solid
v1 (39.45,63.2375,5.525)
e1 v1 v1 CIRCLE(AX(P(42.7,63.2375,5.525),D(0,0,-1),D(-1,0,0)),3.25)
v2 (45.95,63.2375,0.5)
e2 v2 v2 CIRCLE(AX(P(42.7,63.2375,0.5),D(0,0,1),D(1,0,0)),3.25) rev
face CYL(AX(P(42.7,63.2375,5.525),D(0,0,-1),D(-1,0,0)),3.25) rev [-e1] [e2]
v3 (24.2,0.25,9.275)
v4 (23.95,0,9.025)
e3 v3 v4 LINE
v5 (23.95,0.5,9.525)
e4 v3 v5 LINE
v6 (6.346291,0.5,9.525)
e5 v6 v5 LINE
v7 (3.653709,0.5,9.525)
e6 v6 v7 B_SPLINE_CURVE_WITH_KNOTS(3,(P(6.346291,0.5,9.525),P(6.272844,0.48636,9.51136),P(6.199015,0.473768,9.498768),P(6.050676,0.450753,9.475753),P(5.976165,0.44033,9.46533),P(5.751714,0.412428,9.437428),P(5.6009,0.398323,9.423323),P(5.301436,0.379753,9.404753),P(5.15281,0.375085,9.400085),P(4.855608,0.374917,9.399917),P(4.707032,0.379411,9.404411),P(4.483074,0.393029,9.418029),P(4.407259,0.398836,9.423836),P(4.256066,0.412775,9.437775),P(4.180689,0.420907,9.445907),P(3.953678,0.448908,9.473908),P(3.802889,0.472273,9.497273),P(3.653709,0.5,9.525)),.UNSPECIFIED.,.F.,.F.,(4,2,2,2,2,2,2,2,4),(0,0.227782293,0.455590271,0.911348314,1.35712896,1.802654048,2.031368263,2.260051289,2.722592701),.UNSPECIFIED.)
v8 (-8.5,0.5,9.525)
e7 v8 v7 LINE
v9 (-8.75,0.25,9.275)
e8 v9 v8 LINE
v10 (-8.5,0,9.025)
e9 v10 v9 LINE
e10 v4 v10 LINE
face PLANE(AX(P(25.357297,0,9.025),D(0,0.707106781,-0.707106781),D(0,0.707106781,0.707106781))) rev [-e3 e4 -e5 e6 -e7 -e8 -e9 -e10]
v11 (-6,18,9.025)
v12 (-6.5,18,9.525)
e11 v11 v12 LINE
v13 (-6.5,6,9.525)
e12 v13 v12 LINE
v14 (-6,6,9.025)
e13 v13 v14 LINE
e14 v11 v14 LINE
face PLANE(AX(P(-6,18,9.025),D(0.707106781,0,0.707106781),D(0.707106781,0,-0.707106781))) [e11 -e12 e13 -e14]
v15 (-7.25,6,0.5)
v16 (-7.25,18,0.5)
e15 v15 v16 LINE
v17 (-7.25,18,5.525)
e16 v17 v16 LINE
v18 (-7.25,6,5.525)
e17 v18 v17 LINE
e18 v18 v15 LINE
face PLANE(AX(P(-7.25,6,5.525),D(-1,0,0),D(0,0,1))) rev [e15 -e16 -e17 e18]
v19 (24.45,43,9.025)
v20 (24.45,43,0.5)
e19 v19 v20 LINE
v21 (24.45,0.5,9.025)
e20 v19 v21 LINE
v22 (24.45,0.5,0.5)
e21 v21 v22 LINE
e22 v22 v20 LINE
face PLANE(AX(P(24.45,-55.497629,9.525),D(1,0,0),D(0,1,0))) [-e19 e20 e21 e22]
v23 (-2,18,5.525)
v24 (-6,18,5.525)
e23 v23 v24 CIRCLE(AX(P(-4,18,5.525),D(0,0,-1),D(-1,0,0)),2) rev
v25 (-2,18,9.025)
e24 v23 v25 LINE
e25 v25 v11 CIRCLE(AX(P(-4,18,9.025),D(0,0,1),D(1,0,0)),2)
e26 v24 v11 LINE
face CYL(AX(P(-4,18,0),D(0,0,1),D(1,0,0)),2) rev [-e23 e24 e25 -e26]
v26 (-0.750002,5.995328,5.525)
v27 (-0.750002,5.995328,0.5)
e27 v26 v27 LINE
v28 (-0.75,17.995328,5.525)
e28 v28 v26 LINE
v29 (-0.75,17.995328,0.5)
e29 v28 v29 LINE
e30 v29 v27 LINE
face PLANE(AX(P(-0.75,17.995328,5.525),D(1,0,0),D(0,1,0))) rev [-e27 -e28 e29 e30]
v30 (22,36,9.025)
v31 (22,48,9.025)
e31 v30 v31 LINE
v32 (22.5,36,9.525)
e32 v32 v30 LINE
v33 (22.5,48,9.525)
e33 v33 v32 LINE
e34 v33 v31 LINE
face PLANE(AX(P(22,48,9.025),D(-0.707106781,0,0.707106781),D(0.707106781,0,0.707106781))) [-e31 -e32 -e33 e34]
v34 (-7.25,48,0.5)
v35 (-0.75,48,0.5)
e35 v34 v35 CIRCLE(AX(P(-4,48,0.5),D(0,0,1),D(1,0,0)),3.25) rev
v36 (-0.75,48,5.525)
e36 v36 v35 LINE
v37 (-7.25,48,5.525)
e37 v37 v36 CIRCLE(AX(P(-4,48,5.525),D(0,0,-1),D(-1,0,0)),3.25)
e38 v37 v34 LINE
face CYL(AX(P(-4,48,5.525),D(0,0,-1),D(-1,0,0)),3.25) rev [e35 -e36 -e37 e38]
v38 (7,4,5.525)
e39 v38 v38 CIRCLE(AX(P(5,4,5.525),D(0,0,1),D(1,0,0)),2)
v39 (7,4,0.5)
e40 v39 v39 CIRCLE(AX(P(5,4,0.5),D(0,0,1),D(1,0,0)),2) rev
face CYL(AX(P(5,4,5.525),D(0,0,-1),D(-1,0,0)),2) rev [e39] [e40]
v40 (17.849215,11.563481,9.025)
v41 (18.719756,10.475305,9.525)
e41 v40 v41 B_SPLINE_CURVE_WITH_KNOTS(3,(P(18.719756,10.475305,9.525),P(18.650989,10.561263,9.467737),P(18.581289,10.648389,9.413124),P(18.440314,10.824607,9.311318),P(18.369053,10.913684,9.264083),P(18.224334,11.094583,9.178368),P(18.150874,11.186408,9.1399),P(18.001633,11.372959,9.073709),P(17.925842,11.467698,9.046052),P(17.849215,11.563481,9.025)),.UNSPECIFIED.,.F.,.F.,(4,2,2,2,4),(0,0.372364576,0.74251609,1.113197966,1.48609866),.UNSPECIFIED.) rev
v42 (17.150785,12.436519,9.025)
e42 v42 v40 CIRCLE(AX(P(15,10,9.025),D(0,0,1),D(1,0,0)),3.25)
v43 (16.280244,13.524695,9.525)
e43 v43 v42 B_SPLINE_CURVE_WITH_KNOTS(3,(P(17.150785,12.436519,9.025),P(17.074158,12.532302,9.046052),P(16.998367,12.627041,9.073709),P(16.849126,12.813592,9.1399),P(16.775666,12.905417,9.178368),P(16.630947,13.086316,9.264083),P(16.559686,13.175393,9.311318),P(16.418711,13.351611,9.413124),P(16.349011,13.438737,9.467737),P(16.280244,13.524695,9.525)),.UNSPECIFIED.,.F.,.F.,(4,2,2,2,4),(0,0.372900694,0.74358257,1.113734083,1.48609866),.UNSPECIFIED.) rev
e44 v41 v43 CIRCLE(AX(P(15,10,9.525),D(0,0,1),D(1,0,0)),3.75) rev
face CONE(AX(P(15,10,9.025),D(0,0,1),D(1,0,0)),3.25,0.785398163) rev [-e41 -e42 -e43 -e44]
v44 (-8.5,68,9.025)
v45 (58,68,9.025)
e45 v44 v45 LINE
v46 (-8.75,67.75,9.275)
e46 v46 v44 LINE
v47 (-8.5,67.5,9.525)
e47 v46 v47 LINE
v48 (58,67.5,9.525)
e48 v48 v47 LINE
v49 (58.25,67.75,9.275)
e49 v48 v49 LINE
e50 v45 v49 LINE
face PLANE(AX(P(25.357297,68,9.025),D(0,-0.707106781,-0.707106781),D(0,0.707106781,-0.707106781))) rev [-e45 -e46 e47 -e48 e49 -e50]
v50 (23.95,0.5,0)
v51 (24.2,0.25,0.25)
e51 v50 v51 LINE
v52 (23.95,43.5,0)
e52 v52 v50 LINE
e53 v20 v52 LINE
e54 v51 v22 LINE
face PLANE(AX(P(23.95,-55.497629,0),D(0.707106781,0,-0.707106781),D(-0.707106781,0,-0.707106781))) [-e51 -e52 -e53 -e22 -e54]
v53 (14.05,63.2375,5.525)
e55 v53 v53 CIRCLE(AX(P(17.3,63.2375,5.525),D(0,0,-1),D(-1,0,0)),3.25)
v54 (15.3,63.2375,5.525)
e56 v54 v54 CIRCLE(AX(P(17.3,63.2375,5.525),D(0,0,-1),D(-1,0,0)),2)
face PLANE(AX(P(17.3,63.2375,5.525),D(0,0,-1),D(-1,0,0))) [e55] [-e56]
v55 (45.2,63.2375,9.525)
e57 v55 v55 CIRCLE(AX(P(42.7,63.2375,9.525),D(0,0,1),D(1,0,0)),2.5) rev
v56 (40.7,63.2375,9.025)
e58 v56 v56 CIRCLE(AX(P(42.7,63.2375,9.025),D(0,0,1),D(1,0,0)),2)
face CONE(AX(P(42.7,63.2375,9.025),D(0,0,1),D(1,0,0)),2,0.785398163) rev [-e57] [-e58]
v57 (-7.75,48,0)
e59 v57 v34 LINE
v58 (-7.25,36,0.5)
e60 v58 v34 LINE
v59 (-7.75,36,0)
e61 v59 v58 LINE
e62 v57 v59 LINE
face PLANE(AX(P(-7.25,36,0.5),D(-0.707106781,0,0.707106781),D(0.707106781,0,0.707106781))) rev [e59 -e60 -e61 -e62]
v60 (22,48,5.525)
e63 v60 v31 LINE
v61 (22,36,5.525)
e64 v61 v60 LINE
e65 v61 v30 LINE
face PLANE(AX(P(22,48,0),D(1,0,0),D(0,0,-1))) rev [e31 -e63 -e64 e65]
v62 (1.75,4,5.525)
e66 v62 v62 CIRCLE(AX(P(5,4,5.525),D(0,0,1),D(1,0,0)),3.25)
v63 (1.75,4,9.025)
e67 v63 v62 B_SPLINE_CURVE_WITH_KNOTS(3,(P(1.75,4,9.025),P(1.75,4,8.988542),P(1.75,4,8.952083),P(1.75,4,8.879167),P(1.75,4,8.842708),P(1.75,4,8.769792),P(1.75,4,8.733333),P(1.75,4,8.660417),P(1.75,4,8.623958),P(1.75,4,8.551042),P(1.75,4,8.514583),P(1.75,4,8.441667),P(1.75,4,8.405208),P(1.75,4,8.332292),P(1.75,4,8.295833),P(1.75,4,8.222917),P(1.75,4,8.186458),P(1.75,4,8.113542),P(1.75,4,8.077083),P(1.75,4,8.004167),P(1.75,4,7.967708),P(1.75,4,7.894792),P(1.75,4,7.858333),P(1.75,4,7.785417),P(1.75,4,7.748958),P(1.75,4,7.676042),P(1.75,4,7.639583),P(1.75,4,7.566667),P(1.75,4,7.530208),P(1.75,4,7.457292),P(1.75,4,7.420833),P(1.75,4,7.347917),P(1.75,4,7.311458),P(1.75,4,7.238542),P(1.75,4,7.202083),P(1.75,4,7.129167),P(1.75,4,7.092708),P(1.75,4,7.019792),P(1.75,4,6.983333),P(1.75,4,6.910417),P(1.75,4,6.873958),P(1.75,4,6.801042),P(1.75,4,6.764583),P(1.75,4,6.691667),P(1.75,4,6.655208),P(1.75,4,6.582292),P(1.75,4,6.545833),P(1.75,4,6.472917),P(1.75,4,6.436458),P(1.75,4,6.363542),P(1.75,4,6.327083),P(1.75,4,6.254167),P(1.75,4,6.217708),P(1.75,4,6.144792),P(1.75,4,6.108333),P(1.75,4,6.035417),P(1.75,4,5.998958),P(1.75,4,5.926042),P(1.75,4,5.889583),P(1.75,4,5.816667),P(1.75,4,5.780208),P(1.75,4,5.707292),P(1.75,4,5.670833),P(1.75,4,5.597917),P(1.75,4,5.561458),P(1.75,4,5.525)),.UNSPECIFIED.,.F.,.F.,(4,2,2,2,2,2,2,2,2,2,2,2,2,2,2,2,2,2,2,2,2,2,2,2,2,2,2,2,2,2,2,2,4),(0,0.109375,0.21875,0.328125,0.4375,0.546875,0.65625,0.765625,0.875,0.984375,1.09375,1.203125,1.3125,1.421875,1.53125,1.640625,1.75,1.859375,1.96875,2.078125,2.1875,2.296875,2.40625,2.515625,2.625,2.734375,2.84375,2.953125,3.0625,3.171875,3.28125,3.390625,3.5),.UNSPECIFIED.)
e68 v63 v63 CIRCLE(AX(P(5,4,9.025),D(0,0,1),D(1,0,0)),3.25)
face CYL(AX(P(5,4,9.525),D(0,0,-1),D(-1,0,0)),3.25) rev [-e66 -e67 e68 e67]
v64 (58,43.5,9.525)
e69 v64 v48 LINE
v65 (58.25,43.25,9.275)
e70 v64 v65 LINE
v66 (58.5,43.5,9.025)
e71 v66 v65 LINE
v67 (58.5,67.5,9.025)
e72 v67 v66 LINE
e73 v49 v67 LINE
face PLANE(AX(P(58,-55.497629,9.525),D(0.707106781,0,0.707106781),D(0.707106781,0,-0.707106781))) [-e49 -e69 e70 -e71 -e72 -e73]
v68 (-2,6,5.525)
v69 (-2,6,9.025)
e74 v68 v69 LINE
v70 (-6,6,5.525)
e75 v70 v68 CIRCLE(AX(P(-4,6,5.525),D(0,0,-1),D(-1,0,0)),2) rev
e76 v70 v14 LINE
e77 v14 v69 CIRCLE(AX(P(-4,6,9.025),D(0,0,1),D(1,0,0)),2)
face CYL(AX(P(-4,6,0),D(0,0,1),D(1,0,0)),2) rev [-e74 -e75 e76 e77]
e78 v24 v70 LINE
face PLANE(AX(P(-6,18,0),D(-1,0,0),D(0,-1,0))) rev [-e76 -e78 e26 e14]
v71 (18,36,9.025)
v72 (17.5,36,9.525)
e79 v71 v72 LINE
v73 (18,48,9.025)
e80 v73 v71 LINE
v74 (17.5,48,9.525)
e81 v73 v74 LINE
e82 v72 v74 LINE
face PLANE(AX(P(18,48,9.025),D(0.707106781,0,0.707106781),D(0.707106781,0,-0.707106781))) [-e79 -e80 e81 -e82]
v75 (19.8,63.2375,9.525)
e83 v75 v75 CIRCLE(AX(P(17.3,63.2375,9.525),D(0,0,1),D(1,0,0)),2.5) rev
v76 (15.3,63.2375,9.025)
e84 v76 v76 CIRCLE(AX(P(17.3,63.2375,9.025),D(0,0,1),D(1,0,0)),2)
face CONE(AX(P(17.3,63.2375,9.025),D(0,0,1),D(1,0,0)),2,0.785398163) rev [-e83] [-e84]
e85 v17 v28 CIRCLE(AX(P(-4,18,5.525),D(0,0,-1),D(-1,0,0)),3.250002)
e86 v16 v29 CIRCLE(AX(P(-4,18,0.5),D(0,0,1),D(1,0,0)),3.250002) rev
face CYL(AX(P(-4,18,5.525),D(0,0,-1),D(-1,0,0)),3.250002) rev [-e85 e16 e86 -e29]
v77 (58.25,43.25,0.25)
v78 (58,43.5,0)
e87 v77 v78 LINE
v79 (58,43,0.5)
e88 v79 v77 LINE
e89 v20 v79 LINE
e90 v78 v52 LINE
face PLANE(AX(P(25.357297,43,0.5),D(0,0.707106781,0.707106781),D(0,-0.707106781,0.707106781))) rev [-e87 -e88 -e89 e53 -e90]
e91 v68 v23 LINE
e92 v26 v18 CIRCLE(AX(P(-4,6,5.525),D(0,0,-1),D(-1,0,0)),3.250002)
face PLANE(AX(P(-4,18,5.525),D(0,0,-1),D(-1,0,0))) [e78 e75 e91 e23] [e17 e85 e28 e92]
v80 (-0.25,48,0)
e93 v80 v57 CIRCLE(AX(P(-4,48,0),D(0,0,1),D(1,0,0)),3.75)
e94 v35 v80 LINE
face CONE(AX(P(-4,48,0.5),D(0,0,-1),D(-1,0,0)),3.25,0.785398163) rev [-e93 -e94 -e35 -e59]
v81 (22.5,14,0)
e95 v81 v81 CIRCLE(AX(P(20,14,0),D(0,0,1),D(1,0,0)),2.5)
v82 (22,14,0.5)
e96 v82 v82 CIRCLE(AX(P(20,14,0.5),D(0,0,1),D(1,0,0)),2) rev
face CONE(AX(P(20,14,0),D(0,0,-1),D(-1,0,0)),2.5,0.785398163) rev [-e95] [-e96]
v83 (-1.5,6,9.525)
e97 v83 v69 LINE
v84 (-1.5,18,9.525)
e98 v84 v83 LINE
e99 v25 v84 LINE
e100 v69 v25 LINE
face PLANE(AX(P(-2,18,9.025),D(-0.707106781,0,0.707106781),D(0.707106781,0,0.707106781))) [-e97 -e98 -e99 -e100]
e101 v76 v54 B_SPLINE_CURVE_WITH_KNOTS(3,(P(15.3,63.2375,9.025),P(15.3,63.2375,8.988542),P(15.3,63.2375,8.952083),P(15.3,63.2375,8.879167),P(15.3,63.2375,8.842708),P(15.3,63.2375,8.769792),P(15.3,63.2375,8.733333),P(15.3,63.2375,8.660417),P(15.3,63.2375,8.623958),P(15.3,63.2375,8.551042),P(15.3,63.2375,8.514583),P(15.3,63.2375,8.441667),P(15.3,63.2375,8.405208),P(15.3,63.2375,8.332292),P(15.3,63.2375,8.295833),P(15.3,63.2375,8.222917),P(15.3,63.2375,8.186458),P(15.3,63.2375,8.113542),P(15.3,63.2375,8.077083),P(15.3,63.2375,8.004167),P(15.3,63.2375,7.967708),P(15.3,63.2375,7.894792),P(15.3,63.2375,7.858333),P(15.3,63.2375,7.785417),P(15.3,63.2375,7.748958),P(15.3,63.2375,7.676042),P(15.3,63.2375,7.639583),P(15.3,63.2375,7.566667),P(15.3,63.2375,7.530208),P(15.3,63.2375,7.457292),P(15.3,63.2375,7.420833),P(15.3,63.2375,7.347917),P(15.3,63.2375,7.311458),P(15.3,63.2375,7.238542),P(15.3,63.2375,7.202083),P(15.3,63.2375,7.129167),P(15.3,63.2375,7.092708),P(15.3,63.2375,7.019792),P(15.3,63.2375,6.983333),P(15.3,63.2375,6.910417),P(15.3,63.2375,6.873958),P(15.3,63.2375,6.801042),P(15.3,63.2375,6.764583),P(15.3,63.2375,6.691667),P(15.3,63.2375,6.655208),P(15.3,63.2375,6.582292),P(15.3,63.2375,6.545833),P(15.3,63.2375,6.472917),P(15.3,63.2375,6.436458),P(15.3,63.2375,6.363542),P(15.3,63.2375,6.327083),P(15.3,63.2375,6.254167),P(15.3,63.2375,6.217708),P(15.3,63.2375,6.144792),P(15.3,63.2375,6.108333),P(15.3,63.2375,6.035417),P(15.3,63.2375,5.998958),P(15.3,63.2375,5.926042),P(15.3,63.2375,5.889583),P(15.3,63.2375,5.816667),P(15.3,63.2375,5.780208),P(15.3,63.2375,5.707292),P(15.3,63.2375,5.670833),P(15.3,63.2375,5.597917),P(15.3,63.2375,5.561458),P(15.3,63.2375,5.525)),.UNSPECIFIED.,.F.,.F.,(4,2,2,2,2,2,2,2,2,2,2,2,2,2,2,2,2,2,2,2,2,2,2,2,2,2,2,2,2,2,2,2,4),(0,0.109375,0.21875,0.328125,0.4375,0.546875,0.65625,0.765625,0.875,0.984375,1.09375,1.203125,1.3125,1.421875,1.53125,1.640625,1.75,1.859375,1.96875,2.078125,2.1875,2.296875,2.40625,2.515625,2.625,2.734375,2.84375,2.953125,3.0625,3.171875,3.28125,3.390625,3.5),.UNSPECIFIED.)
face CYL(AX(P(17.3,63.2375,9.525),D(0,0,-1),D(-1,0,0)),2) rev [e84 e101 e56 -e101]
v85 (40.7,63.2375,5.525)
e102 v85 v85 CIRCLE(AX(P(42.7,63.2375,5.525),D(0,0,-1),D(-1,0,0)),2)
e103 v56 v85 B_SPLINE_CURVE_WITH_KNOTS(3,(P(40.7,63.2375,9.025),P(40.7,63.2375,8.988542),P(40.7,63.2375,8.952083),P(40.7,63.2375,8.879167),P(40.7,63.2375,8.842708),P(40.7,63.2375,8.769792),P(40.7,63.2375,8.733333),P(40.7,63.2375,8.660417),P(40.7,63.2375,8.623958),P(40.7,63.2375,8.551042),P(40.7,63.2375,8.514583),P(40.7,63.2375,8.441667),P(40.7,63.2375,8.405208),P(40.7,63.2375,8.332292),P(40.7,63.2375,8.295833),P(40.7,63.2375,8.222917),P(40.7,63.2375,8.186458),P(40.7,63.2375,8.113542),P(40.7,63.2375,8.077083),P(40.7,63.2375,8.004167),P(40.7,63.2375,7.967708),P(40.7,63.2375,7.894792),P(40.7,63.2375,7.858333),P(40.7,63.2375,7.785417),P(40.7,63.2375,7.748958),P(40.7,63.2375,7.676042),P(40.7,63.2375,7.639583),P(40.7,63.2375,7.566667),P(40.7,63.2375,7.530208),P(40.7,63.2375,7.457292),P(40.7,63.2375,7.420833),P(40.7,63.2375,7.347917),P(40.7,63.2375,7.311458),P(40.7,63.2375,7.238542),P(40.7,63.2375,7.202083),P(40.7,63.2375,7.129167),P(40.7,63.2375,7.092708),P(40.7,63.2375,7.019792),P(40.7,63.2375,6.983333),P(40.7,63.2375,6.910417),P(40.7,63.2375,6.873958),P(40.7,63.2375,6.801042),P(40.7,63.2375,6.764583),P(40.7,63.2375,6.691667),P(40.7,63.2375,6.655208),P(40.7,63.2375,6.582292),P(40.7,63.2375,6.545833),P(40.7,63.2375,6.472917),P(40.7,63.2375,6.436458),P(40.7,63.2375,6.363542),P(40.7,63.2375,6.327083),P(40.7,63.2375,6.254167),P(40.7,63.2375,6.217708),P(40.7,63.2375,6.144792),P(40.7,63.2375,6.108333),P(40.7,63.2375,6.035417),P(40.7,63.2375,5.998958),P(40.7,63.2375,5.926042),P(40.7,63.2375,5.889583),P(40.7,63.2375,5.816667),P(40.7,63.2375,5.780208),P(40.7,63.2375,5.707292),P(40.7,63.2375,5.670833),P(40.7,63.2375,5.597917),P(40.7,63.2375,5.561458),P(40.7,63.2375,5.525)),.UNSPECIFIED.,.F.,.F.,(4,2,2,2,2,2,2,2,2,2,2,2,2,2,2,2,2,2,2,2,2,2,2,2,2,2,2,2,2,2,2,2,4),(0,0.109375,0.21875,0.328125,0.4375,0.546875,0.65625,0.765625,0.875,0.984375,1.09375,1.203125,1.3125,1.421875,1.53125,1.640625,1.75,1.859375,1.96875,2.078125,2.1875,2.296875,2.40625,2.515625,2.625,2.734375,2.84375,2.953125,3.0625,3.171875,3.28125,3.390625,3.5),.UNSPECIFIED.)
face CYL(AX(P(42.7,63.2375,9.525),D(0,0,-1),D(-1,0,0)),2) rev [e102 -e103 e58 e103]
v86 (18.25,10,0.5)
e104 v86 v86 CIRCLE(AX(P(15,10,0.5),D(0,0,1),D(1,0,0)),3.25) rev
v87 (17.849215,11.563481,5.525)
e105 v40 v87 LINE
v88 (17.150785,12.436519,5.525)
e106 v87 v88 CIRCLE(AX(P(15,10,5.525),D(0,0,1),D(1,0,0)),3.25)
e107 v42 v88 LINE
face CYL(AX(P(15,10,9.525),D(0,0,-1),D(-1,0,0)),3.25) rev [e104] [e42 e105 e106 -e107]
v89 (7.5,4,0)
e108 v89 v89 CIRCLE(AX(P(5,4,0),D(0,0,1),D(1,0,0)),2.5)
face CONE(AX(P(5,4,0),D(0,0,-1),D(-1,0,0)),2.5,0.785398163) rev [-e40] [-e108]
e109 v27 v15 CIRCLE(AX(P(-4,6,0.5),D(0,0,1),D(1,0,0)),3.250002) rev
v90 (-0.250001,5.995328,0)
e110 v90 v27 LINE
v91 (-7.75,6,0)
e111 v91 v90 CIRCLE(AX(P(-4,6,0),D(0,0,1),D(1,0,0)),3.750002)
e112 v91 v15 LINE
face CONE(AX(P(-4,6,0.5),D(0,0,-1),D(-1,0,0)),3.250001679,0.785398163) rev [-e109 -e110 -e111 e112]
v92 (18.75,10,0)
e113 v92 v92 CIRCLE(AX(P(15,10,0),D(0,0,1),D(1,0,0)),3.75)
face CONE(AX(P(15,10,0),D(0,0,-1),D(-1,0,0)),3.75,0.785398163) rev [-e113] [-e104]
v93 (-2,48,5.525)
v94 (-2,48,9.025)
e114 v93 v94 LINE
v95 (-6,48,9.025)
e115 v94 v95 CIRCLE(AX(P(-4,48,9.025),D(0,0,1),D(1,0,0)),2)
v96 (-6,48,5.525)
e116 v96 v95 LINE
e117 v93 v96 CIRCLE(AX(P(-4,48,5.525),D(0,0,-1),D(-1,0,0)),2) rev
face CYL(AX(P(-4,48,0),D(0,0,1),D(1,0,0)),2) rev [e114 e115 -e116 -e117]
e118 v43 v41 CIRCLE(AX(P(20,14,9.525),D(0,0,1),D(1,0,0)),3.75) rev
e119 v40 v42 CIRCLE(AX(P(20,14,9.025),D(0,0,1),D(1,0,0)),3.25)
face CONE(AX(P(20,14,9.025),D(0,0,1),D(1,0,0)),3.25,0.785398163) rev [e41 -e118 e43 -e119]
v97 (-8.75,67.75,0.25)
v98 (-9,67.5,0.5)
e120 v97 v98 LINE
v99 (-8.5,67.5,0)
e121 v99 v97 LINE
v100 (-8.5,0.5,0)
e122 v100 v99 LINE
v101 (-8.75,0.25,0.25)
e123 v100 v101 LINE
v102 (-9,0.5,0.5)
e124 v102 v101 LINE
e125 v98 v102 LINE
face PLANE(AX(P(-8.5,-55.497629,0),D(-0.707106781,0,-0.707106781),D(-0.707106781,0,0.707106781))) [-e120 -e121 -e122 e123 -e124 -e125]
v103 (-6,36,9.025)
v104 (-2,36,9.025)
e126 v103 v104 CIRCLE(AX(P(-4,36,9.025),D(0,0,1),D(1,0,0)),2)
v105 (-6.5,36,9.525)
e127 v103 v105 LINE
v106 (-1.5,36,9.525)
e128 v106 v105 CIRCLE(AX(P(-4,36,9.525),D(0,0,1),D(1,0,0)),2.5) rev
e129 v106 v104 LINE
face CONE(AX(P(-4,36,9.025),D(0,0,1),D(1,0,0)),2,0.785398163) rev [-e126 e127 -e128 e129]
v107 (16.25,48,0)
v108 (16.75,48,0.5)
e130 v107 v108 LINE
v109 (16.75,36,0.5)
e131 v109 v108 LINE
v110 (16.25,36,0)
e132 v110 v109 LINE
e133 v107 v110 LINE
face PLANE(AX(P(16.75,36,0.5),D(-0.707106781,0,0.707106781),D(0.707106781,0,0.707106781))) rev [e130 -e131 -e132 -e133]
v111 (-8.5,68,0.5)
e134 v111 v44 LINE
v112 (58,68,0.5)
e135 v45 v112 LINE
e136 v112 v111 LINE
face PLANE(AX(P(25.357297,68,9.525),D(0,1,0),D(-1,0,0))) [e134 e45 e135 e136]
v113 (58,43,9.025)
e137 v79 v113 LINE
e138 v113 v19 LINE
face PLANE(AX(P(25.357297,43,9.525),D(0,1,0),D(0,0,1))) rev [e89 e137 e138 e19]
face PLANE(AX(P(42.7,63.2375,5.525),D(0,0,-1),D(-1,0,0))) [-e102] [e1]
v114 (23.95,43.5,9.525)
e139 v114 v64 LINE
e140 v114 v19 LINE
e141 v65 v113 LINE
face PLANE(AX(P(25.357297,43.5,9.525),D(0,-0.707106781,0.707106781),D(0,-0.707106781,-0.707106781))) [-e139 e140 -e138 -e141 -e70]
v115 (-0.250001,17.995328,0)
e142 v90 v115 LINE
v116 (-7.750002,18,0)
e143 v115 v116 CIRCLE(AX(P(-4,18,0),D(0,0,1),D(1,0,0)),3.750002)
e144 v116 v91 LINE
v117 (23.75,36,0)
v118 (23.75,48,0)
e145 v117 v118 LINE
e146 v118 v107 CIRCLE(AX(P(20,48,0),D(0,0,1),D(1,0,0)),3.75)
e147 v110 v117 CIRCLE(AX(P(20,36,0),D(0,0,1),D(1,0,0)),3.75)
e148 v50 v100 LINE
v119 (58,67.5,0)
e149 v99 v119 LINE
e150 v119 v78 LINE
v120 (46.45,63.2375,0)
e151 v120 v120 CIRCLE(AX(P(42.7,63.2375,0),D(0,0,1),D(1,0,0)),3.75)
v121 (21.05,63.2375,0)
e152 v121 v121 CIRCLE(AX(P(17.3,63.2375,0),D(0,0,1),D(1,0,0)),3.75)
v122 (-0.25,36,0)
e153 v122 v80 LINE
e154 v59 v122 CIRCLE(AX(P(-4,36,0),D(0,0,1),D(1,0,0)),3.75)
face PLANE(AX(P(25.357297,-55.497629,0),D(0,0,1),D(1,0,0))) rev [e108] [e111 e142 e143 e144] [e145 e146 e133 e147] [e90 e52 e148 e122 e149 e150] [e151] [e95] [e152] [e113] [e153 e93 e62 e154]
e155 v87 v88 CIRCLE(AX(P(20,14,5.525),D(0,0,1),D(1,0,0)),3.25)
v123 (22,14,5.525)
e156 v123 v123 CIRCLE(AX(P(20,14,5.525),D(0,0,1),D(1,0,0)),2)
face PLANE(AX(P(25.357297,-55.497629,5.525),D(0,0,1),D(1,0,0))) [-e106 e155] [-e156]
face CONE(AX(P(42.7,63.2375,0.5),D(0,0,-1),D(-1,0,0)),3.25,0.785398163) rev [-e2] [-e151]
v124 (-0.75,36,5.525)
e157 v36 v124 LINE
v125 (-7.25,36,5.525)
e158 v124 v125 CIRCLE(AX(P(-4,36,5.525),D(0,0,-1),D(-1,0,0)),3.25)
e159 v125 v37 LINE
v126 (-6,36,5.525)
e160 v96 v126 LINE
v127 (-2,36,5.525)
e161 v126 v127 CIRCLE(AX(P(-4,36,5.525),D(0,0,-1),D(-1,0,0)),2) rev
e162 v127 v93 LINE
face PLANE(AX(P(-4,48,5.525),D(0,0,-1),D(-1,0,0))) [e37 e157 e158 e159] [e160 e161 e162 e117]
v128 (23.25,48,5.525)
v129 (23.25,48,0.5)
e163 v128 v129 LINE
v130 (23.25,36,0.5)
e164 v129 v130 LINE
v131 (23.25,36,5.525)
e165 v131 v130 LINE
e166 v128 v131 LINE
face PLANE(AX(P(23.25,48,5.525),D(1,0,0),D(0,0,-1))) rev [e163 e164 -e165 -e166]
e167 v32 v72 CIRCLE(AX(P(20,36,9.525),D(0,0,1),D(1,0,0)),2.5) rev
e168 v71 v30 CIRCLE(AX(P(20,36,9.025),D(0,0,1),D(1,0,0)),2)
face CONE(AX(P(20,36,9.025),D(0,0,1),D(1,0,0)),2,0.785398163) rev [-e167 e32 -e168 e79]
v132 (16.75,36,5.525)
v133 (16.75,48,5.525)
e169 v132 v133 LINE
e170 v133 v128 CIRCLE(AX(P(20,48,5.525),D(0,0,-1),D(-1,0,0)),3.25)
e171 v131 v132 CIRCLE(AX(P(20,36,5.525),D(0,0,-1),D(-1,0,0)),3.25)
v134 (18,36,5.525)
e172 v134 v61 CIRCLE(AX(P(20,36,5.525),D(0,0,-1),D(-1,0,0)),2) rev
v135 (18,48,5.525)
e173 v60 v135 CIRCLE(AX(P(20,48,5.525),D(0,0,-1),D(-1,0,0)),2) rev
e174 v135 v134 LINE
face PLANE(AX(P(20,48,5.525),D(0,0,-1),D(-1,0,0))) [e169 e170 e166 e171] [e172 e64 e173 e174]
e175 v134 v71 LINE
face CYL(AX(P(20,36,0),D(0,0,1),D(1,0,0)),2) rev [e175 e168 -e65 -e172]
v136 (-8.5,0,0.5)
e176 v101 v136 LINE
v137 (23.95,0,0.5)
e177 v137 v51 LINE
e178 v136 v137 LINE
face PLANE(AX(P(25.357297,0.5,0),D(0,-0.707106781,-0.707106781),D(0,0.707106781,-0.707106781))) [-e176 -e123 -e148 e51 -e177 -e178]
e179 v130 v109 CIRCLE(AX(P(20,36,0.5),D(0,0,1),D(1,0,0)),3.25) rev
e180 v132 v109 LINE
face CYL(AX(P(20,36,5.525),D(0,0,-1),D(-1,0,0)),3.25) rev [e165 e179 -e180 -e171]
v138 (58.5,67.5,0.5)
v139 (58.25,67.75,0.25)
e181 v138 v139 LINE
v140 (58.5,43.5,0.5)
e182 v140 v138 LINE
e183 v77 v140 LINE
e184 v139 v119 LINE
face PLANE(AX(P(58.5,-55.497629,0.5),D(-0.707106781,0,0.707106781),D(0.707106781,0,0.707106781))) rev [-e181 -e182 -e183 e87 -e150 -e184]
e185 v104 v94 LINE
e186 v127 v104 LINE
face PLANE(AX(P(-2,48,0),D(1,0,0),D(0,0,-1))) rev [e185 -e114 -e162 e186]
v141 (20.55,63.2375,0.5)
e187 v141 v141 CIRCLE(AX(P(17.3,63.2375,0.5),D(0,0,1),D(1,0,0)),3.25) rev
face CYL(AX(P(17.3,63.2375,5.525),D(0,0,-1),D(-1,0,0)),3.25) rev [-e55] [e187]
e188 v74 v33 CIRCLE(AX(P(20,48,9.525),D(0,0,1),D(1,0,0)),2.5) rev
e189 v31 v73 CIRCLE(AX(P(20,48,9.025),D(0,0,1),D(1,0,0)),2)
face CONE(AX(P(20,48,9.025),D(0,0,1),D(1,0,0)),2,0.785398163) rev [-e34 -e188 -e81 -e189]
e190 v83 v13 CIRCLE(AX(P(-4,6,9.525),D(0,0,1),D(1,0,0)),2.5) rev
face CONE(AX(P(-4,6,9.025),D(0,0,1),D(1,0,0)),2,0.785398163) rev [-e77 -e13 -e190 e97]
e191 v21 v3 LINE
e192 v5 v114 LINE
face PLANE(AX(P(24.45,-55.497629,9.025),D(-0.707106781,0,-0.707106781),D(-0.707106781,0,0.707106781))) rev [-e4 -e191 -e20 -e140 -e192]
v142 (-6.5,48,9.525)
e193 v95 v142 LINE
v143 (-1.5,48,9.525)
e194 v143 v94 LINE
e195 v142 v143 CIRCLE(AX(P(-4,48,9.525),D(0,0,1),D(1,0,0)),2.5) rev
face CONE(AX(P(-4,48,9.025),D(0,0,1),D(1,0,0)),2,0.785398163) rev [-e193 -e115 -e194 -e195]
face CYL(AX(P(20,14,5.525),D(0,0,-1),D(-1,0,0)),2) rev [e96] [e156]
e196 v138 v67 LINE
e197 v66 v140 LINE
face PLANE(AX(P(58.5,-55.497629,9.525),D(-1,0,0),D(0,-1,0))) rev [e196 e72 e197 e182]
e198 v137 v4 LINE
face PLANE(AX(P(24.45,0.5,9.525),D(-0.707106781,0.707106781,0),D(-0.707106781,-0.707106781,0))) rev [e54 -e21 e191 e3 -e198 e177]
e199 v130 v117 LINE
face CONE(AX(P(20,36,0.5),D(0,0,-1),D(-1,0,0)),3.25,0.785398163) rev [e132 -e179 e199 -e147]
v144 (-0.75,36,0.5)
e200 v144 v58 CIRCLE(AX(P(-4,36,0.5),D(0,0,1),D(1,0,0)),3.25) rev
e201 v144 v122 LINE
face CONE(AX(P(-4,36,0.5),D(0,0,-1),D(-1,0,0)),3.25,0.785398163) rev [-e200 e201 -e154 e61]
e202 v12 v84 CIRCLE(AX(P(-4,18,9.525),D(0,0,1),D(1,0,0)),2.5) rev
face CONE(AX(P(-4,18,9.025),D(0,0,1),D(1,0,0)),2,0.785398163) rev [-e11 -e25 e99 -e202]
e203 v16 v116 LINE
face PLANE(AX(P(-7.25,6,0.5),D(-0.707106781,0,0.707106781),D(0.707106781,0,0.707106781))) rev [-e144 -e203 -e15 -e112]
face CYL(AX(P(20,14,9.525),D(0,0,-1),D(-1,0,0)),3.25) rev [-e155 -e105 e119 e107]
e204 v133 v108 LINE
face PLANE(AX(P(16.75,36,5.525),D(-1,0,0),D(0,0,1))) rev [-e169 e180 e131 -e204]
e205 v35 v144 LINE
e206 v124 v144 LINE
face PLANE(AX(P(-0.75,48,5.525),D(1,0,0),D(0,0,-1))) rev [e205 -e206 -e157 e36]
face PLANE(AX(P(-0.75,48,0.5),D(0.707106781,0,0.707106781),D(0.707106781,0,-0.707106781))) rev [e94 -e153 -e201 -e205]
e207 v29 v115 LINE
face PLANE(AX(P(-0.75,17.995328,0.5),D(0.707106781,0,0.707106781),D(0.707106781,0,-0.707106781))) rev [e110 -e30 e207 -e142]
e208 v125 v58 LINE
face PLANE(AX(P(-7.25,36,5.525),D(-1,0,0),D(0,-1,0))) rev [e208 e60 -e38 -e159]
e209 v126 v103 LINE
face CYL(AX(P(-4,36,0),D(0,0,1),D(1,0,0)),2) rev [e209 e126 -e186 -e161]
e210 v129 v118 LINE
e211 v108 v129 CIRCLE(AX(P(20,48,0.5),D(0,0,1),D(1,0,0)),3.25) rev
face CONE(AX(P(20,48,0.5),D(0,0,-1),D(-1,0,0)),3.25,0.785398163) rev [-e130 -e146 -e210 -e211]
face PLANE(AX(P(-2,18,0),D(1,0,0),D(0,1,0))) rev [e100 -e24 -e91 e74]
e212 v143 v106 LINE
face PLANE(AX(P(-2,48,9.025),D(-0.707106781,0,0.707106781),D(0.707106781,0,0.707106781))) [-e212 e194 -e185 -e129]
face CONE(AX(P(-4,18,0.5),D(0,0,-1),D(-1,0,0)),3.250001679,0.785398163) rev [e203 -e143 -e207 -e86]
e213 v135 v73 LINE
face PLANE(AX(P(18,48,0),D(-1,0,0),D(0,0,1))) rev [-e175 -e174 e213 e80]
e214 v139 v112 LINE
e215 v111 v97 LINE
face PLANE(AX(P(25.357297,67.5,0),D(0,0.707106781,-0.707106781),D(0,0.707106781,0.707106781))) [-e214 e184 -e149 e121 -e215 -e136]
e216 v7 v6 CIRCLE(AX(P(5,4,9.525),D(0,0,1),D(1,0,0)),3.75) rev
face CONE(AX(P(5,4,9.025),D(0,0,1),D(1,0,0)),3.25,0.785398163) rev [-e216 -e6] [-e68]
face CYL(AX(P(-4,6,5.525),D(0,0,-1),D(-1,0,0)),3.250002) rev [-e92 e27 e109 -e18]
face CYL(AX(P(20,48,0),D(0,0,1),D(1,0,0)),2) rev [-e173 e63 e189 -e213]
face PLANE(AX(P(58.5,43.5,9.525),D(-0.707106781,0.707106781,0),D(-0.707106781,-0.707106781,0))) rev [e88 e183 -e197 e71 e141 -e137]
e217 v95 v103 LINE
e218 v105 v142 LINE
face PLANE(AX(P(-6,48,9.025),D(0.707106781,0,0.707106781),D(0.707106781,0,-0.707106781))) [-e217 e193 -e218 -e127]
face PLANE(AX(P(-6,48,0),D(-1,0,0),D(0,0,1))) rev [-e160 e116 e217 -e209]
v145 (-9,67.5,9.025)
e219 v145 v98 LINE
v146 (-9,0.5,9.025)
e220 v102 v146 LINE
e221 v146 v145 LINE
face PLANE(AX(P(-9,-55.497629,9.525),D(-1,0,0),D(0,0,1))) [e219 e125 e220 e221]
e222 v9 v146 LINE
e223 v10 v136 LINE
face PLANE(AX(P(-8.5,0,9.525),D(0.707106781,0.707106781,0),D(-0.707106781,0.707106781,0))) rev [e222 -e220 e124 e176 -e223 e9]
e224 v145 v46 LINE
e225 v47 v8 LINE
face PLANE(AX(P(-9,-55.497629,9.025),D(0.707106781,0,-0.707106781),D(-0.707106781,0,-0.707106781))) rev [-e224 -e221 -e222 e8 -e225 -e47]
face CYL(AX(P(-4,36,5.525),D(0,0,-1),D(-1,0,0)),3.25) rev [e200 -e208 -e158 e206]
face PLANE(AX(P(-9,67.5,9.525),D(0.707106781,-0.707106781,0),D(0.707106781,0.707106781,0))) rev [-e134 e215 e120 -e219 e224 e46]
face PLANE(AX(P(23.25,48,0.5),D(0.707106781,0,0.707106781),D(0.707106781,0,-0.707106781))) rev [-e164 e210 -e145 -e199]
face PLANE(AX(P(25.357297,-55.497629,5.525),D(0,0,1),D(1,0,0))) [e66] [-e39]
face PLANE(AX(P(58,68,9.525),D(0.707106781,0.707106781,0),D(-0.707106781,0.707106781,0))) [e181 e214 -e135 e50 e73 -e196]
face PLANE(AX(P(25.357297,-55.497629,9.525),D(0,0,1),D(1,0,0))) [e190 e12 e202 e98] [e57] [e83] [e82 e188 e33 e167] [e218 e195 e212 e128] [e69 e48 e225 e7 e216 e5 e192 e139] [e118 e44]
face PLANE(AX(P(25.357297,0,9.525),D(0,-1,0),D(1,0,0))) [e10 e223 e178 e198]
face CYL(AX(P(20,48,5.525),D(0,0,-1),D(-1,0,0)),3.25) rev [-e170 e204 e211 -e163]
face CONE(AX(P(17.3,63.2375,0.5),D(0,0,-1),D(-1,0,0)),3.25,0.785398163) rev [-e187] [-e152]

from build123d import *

# Parameters (mm, degrees)
SKETCH1_R           = 3.25
SKETCH1_R_2         = 2
BOSS_EXTRUDE1_DEPTH = 9.525
SKETCH1_4_R         = 2
SKETCH1_4_R_2       = 3.25
BOSS_EXTRUDE3_DEPTH = 5.525
CUT_EXTRUDE1_DEPTH  = 91.205186242
CUT_EXTRUDE2_DEPTH  = 5.525
CHAMFER1_SIZE       = 0.5
CHAMFER2_SIZE       = 0.5
CHAMFER3_SIZE       = 0.5
CHAMFER4_SIZE       = 0.5
SKETCH5_R           = 3.25
CUT_EXTRUDE3_DEPTH  = 5.525
CHAMFER5_SIZE       = 0.5


with BuildPart() as part:
    # Sketch1 → Boss-Extrude1 (new body)
    with BuildSketch(Plane.XY):
        Polygon((-9, 0), (0, 0), (24.45, 0), (24.45, 43), (58.5, 43), (58.5, 68), (0, 68), (-9, 68), align=None)
        with Locations(Location((5, 4, 0), (0, 0, 180))):
            Circle(SKETCH1_R, mode=Mode.SUBTRACT)
        with BuildLine():
            ThreePointArc((17.849215148, 11.563481065), (18.148209748, 10.807016347), (18.25, 10))
            ThreePointArc((18.25, 10), (12.037522087, 8.663502856), (17.150784852, 12.436518935))
            ThreePointArc((17.150784852, 12.436518935), (19.192983653, 17.148209748), (23.25, 14))
            ThreePointArc((23.25, 14), (21.336497144, 11.037522087), (17.849215148, 11.563481065))
        make_face(mode=Mode.SUBTRACT)
        with Locations(Location((17.3, 63.2375, 0), (0, 0, 180))):
            Circle(SKETCH1_R_2, mode=Mode.SUBTRACT)
        with Locations(Location((42.7, 63.2375, 0), (0, 0, 180))):
            Circle(SKETCH1_R_2, mode=Mode.SUBTRACT)
    extrude(amount=BOSS_EXTRUDE1_DEPTH)

    # Sketch1<4> → Boss-Extrude3 (add)
    # profile 1 of 2: a face of its own
    with BuildSketch(Plane.XY):
        with BuildLine():
            ThreePointArc((17.150784852, 12.436518935), (17.537823631, 12.030258905), (17.849215148, 11.563481065))
            ThreePointArc((17.849215148, 11.563481065), (22.537823631, 16.030258905), (17.150784852, 12.436518935))
        make_face()
        with Locations((20, 14)):
            Circle(SKETCH1_4_R, mode=Mode.SUBTRACT)
    # profile 2 of 2: a face of its own
    with BuildSketch(Plane.XY):
        with Locations(Location((5, 4, 0), (0, 0, 180))):
            Circle(SKETCH1_4_R_2)
        with Locations((5, 4)):
            Circle(SKETCH1_4_R, mode=Mode.SUBTRACT)
    extrude(amount=BOSS_EXTRUDE3_DEPTH)

    # Sketch3 → Cut-Extrude1 (cut, through all)
    with BuildSketch(Plane.XY.offset(9.525)):
        with BuildLine():
            Line((-2, 18), (-2, 6))
            ThreePointArc((-2, 6), (-4, 4), (-6, 6))
            Line((-6, 6), (-6, 18))
            ThreePointArc((-6, 18), (-4, 20), (-2, 18))
        make_face()
        with BuildLine():
            Line((-6, 48), (-6, 36))
            ThreePointArc((-6, 36), (-4, 34), (-2, 36))
            Line((-2, 36), (-2, 48))
            ThreePointArc((-2, 48), (-4, 50), (-6, 48))
        make_face()
        with BuildLine():
            Line((18, 48), (18, 36))
            ThreePointArc((18, 36), (20, 34), (22, 36))
            Line((22, 36), (22, 48))
            ThreePointArc((22, 48), (20, 50), (18, 48))
        make_face()
    extrude(amount=-CUT_EXTRUDE1_DEPTH, mode=Mode.SUBTRACT)

    # Sketch4 → Cut-Extrude2 (cut)
    with BuildSketch(Plane(origin=(0, 0, 0), x_dir=(-1, 0, 0), z_dir=(0, 0, -1))):
        with BuildLine():
            Line((-16.75, 36), (-16.75, 48))
            ThreePointArc((-16.75, 48), (-20, 51.25), (-23.25, 48))
            Line((-23.25, 48), (-23.25, 36))
            ThreePointArc((-23.25, 36), (-20, 32.75), (-16.75, 36))
        make_face()
        with BuildLine():
            Line((0.75, 48), (0.75, 36))
            ThreePointArc((0.75, 36), (4, 32.75), (7.25, 36))
            Line((7.25, 36), (7.25, 48))
            ThreePointArc((7.25, 48), (4, 51.25), (0.75, 48))
        make_face()
        with BuildLine():
            Line((7.25, 6), (7.25, 18))
            ThreePointArc((7.25, 18), (3.997663937, 21.24999916), (0.75, 17.99532787))
            Line((0.75, 17.99532787), (0.75, 5.99532787))
            ThreePointArc((0.75, 5.99532787), (4.002336066, 2.749997481), (7.25, 6))
        make_face()
    extrude(amount=-CUT_EXTRUDE2_DEPTH, mode=Mode.SUBTRACT)

    # Chamfer1
    chamfer1_edges = [part.edges().sort_by_distance(p)[0] for p in [
        (-9, 68, 4.7625),
    ]]
    chamfer(chamfer1_edges, length=CHAMFER1_SIZE)

    # Chamfer2
    chamfer2_edges = [part.edges().sort_by_distance(p)[0] for p in [
        (58.5, 68, 4.7625),
        (58.5, 43, 4.7625),
        (24.45, 0, 4.7625),
        (-9, 0, 4.7625),
    ]]
    chamfer(chamfer2_edges, length=CHAMFER2_SIZE)

    # Chamfer3
    # the kernel refuses this chamfer: 0.5 mm, written as the material it takes off along each edge
    with BuildSketch(Plane(origin=(59.285841494, 68, 0), x_dir=(0, -0.9996219169112968, -0.027495876610586483), z_dir=(-1, 0, 0)), Plane(origin=(-9.785841494, 68, 9.525), x_dir=(0, -0.9996219169112968, 0.02749587661058574), z_dir=(1, 0, 0))) as chamfer3_piece_1:
        Polygon((CHAMFER3_SIZE * 0.999621916911, CHAMFER3_SIZE * 0.0274958766106), (-CHAMFER3_SIZE * 0.0274958766106, CHAMFER3_SIZE * 0.999621916911), (0, 0), align=None)
    extrude(amount=69.071682988, mode=Mode.SUBTRACT)
    with BuildSketch(Plane(origin=(58.5, 42.214158506, 0), x_dir=(-0.9996219169112968, 0, -0.027495876610586483), z_dir=(0, 1, 0))) as chamfer3_piece_2:
        Polygon((CHAMFER3_SIZE * 0.999621916911, CHAMFER3_SIZE * 0.0274958766106), (-CHAMFER3_SIZE * 0.0274958766106, CHAMFER3_SIZE * 0.999621916911), (0, 0), align=None)
    extrude(amount=26.571682988, mode=Mode.SUBTRACT)
    with BuildSketch(Plane(origin=(24.45, 43, 0), x_dir=(0, 0.9996219169112968, -0.027495876610586483), z_dir=(1, 0, 0))) as chamfer3_piece_3:
        Polygon((CHAMFER3_SIZE * 0.999621916911, CHAMFER3_SIZE * 0.0274958766106), (-CHAMFER3_SIZE * 0.0274958766106, CHAMFER3_SIZE * 0.999621916911), (0, 0), align=None)
    extrude(amount=34.835841494, mode=Mode.SUBTRACT)
    with BuildSketch(Plane(origin=(24.45, -0.785841494, 0), x_dir=(-0.9996219169112968, 0, -0.027495876610586292), z_dir=(0, 1, 0))) as chamfer3_piece_4:
        Polygon((CHAMFER3_SIZE * 0.999621916911, CHAMFER3_SIZE * 0.0274958766106), (-CHAMFER3_SIZE * 0.0274958766106, CHAMFER3_SIZE * 0.999621916911), (0, 0), align=None)
    extrude(amount=43.785841494, mode=Mode.SUBTRACT)
    with BuildSketch(Plane(origin=(58.5, 42.214158506, 9.525), x_dir=(-0.9996219169112968, 0, 0.02749587661058574), z_dir=(0, 1, 0))) as chamfer3_piece_5:
        Polygon((CHAMFER3_SIZE * 0.999621916911, -CHAMFER3_SIZE * 0.0274958766106), (-CHAMFER3_SIZE * 0.0274958766106, -CHAMFER3_SIZE * 0.999621916911), (0, 0), align=None)
    extrude(amount=26.571682988, mode=Mode.SUBTRACT)
    with BuildSketch(Plane(origin=(24.45, 43, 9.525), x_dir=(0, 0.9996219169112968, 0.02749587661058574), z_dir=(1, 0, 0))) as chamfer3_piece_6:
        Polygon((CHAMFER3_SIZE * 0.999621916911, -CHAMFER3_SIZE * 0.0274958766106), (-CHAMFER3_SIZE * 0.0274958766106, -CHAMFER3_SIZE * 0.999621916911), (0, 0), align=None)
    extrude(amount=34.835841494, mode=Mode.SUBTRACT)
    with BuildSketch(Plane(origin=(24.45, -0.785841494, 9.525), x_dir=(-0.9996219169112968, 0, 0.02749587661058555), z_dir=(0, 1, 0))) as chamfer3_piece_7:
        Polygon((CHAMFER3_SIZE * 0.999621916911, -CHAMFER3_SIZE * 0.0274958766106), (-CHAMFER3_SIZE * 0.0274958766106, -CHAMFER3_SIZE * 0.999621916911), (0, 0), align=None)
    extrude(amount=43.785841494, mode=Mode.SUBTRACT)
    with BuildSketch(Plane(origin=(-9.785841494, 0, 0), x_dir=(0, 0.9996219169112968, -0.027495876610586334), z_dir=(1, 0, 0)), Plane(origin=(25.235841494, 0, 9.525), x_dir=(0, 0.9996219169112968, 0.02749587661058563), z_dir=(-1, 0, 0))) as chamfer3_piece_8:
        Polygon((CHAMFER3_SIZE * 0.999621916911, CHAMFER3_SIZE * 0.0274958766106), (-CHAMFER3_SIZE * 0.0274958766106, CHAMFER3_SIZE * 0.999621916911), (0, 0), align=None)
    extrude(amount=35.021682988, mode=Mode.SUBTRACT)
    with BuildSketch(Plane(origin=(-9, 68.785841494, 0), x_dir=(-0.02749587661058563, 0, 0.9996219169112968), z_dir=(0, -1, 0))) as chamfer3_piece_9:
        Polygon((CHAMFER3_SIZE * 0.999621916911, -CHAMFER3_SIZE * 0.0274958766106), (-CHAMFER3_SIZE * 0.0274958766106, -CHAMFER3_SIZE * 0.999621916911), (0, 0), align=None)
    extrude(amount=69.571682988, mode=Mode.SUBTRACT)
    with BuildSketch(Plane(origin=(-9, 68.785841494, 9.525), x_dir=(-0.027495876610585647, 0, -0.9996219169112968), z_dir=(0, -1, 0))) as chamfer3_piece_10:
        Polygon((CHAMFER3_SIZE * 0.999621916911, CHAMFER3_SIZE * 0.0274958766106), (-CHAMFER3_SIZE * 0.0274958766106, CHAMFER3_SIZE * 0.999621916911), (0, 0), align=None)
    extrude(amount=69.571682988, mode=Mode.SUBTRACT)
    with BuildSketch(Plane(origin=(24.45, -0.785841494, 0), x_dir=(-0.9996219169112968, 0, -0.027495876610586292), z_dir=(0, 1, 0))) as chamfer3_piece_11a_section:
        Polygon((CHAMFER3_SIZE * 0.999621916911, CHAMFER3_SIZE * 0.0274958766106), (-CHAMFER3_SIZE * 0.0274958766106, CHAMFER3_SIZE * 0.999621916911), (0, 0), align=None)
    chamfer3_piece_11a = extrude(amount=45.071682988, mode=Mode.PRIVATE)
    chamfer3_piece_11a = split(chamfer3_piece_11a, bisect_by=Plane(origin=(24.285103187, 43, 0.164896813), z_dir=(0, 1, 0)), keep=Keep.TOP, mode=Mode.PRIVATE)
    with BuildSketch(Plane(origin=(23.164158506, 43, 0), x_dir=(0, 0.9996219169112968, -0.027495876610586483), z_dir=(1, 0, 0))) as chamfer3_piece_11b_section:
        Polygon((CHAMFER3_SIZE * 0.999621916911, CHAMFER3_SIZE * 0.0274958766106), (-CHAMFER3_SIZE * 0.0274958766106, CHAMFER3_SIZE * 0.999621916911), (0, 0), align=None)
    chamfer3_piece_11b = extrude(amount=36.121682988, mode=Mode.PRIVATE)
    chamfer3_piece_11b = split(chamfer3_piece_11b, bisect_by=Plane(origin=(24.45, 43.164896813, 0.164896813), z_dir=(-1, 0, 0)), keep=Keep.TOP, mode=Mode.PRIVATE)
    chamfer3_piece_11 = chamfer3_piece_11a & chamfer3_piece_11b
    add(chamfer3_piece_11, mode=Mode.SUBTRACT)
    with BuildSketch(Plane(origin=(24.45, -0.785841494, 9.525), x_dir=(-0.9996219169112968, 0, 0.02749587661058555), z_dir=(0, 1, 0))) as chamfer3_piece_12a_section:
        Polygon((CHAMFER3_SIZE * 0.999621916911, -CHAMFER3_SIZE * 0.0274958766106), (-CHAMFER3_SIZE * 0.0274958766106, -CHAMFER3_SIZE * 0.999621916911), (0, 0), align=None)
    chamfer3_piece_12a = extrude(amount=45.071682988, mode=Mode.PRIVATE)
    chamfer3_piece_12a = split(chamfer3_piece_12a, bisect_by=Plane(origin=(24.285103187, 43, 9.360103187), z_dir=(0, 1, 0)), keep=Keep.TOP, mode=Mode.PRIVATE)
    with BuildSketch(Plane(origin=(23.164158506, 43, 9.525), x_dir=(0, 0.9996219169112968, 0.02749587661058574), z_dir=(1, 0, 0))) as chamfer3_piece_12b_section:
        Polygon((CHAMFER3_SIZE * 0.999621916911, -CHAMFER3_SIZE * 0.0274958766106), (-CHAMFER3_SIZE * 0.0274958766106, -CHAMFER3_SIZE * 0.999621916911), (0, 0), align=None)
    chamfer3_piece_12b = extrude(amount=36.121682988, mode=Mode.PRIVATE)
    chamfer3_piece_12b = split(chamfer3_piece_12b, bisect_by=Plane(origin=(24.45, 43.164896813, 9.360103187), z_dir=(-1, 0, 0)), keep=Keep.TOP, mode=Mode.PRIVATE)
    chamfer3_piece_12 = chamfer3_piece_12a & chamfer3_piece_12b
    add(chamfer3_piece_12, mode=Mode.SUBTRACT)

    # Chamfer4
    # the kernel refuses this chamfer: 0.5 mm, written as the material it takes off along each edge
    with BuildSketch(Plane(origin=(17.3, 63.2375, 9.525), x_dir=(-1, 0, 0), z_dir=(0, 1, 0))) as chamfer4_piece_1:
        Polygon((2 + CHAMFER4_SIZE, 0), (2, -CHAMFER4_SIZE), (2, 0), align=None)
    revolve(axis=Axis((17.3, 63.2375, 9.525), (0, 0, 1)), mode=Mode.SUBTRACT)
    with BuildSketch(Plane(origin=(20, 14, 9.525), x_dir=(-0.6228814791380578, -0.7823162167223593, 0), z_dir=(0.7823162167223593, -0.6228814791380578, 0))) as chamfer4_piece_2:
        Polygon((3.25 + CHAMFER4_SIZE, 0), (3.25, CHAMFER4_SIZE), (3.25, 0), align=None)
    revolve(axis=Axis((20, 14, 9.525), (0, 0, -1)), revolution_arc=231.473137965, mode=Mode.SUBTRACT)
    with BuildSketch(Plane(origin=(15, 10, 9.525), x_dir=(0.7789024218691897, 0.627145132490328, 0), z_dir=(0.627145132490328, -0.7789024218691897, 0))) as chamfer4_piece_3:
        Polygon((3.25 + CHAMFER4_SIZE, 0), (3.25, -CHAMFER4_SIZE), (3.25, 0), align=None)
    revolve(axis=Axis((15, 10, 9.525), (0, 0, 1)), revolution_arc=359.64, mode=Mode.SUBTRACT)
    with BuildSketch(Plane(origin=(5, 4, 9.525), x_dir=(-1, 0, 0), z_dir=(0, 1, 0))) as chamfer4_piece_4:
        Polygon((3.25 + CHAMFER4_SIZE, 0), (3.25, -CHAMFER4_SIZE), (3.25, 0), align=None)
    revolve(axis=Axis((5, 4, 9.525), (0, 0, 1)), mode=Mode.SUBTRACT)
    with BuildSketch(Plane(origin=(-4, 48, 9.525), x_dir=(1, 0, 0), z_dir=(0, -1, 0))) as chamfer4_piece_5:
        Polygon((2 + CHAMFER4_SIZE, 0), (2, -CHAMFER4_SIZE), (2, 0), align=None)
    revolve(axis=Axis((-4, 48, 9.525), (0, 0, 1)), revolution_arc=180, mode=Mode.SUBTRACT)
    with BuildSketch(Plane(origin=(-6, 48, 9.525), x_dir=(-0.9996219169112968, 0, 0.027495876610585647), z_dir=(0, -1, 0)), Plane(origin=(-2, 36, 9.525), x_dir=(0.9996219169112968, 0, 0.027495876610585706), z_dir=(0, 1, 0)), Plane(origin=(18, 48, 9.525), x_dir=(-0.9996219169112968, 0, 0.02749587661058555), z_dir=(0, -1, 0)), Plane(origin=(22, 36, 9.525), x_dir=(0.9996219169112968, 0, 0.02749587661058555), z_dir=(0, 1, 0))) as chamfer4_piece_6:
        Polygon((CHAMFER4_SIZE * 0.999621916911, CHAMFER4_SIZE * 0.0274958766106), (-CHAMFER4_SIZE * 0.0274958766106, CHAMFER4_SIZE * 0.999621916911), (0, 0), align=None)
    extrude(amount=12, mode=Mode.SUBTRACT)
    with BuildSketch(Plane(origin=(-4, 36, 9.525), x_dir=(-1, 0, 0), z_dir=(0, 1, 0))) as chamfer4_piece_7:
        Polygon((2 + CHAMFER4_SIZE, 0), (2, -CHAMFER4_SIZE), (2, 0), align=None)
    revolve(axis=Axis((-4, 36, 9.525), (0, 0, 1)), revolution_arc=180, mode=Mode.SUBTRACT)
    with BuildSketch(Plane(origin=(-4, 18, 9.525), x_dir=(-1, 0, 0), z_dir=(0, -1, 0))) as chamfer4_piece_8:
        Polygon((2 + CHAMFER4_SIZE, 0), (2, CHAMFER4_SIZE), (2, 0), align=None)
    revolve(axis=Axis((-4, 18, 9.525), (0, 0, -1)), revolution_arc=180, mode=Mode.SUBTRACT)
    with BuildSketch(Plane(origin=(-6, 6, 9.525), x_dir=(-0.9996219169112968, 0, 0.027495876610585647), z_dir=(0, 1, 0)), Plane(origin=(-2, 18, 9.525), x_dir=(0.9996219169112968, 0, 0.027495876610585657), z_dir=(0, -1, 0))) as chamfer4_piece_9:
        Polygon((CHAMFER4_SIZE * 0.999621916911, -CHAMFER4_SIZE * 0.0274958766106), (-CHAMFER4_SIZE * 0.0274958766106, -CHAMFER4_SIZE * 0.999621916911), (0, 0), align=None)
    extrude(amount=12, mode=Mode.SUBTRACT)
    with BuildSketch(Plane(origin=(-4, 6, 9.525), x_dir=(1, 0, 0), z_dir=(0, 1, 0))) as chamfer4_piece_10:
        Polygon((2 + CHAMFER4_SIZE, 0), (2, CHAMFER4_SIZE), (2, 0), align=None)
    revolve(axis=Axis((-4, 6, 9.525), (0, 0, -1)), revolution_arc=180, mode=Mode.SUBTRACT)
    with BuildSketch(Plane(origin=(20, 48, 9.525), x_dir=(1, 0, 0), z_dir=(0, -1, 0))) as chamfer4_piece_11:
        Polygon((2 + CHAMFER4_SIZE, 0), (2, -CHAMFER4_SIZE), (2, 0), align=None)
    revolve(axis=Axis((20, 48, 9.525), (0, 0, 1)), revolution_arc=180, mode=Mode.SUBTRACT)
    with BuildSketch(Plane(origin=(20, 36, 9.525), x_dir=(-1, 0, 0), z_dir=(0, 1, 0))) as chamfer4_piece_12:
        Polygon((2 + CHAMFER4_SIZE, 0), (2, -CHAMFER4_SIZE), (2, 0), align=None)
    revolve(axis=Axis((20, 36, 9.525), (0, 0, 1)), revolution_arc=180, mode=Mode.SUBTRACT)
    with BuildSketch(Plane(origin=(42.7, 63.2375, 9.525), x_dir=(-1, 0, 0), z_dir=(0, 1, 0))) as chamfer4_piece_13:
        Polygon((2 + CHAMFER4_SIZE, 0), (2, -CHAMFER4_SIZE), (2, 0), align=None)
    revolve(axis=Axis((42.7, 63.2375, 9.525), (0, 0, 1)), mode=Mode.SUBTRACT)
    with BuildSketch(Plane(origin=(20, 14, 9.525), x_dir=(1, 0, 0), z_dir=(0, 1, 0))) as chamfer4_piece_14:
        Polygon((3.25 + CHAMFER4_SIZE, 0), (3.25, CHAMFER4_SIZE), (3.25, 0), align=None)
    revolve(axis=Axis((20, 14, 9.525), (0, 0, -1)), revolution_arc=154.123896305, mode=Mode.SUBTRACT)

    # Sketch5 → Cut-Extrude3 (cut)
    with BuildSketch(Plane(origin=(0, 0, 0), x_dir=(-1, 0, 0), z_dir=(0, 0, -1))):
        with Locations((-42.7, 63.2375)):
            Circle(SKETCH5_R)
        with Locations((-17.3, 63.2375)):
            Circle(SKETCH5_R)
    extrude(amount=-CUT_EXTRUDE3_DEPTH, mode=Mode.SUBTRACT)

    # Chamfer5
    chamfer5_edges = [part.edges().sort_by_distance(p)[0] for p in [
        (20, 51.25, 0),
        (23.25, 42, 0),
        (20, 32.75, 0),
        (16.75, 42, 0),
        (-4, 51.25, 0),
        (-0.75, 42, 0),
        (-4, 32.75, 0),
        (-7.25, 42, 0),
        (-3.997662256, 21.249999159, 0),
        (-0.75, 11.99532787, 0),
        (-4.002334388, 2.74999748, 0),
        (-7.25, 12, 0),
        (12.849215148, 7.563481065, 0),
        (20.55, 63.2375, 0),
        (45.95, 63.2375, 0),
        (18, 14, 0),
        (3, 4, 0),
    ]]
    chamfer(chamfer5_edges, length=CHAMFER5_SIZE)


solid = part.part
